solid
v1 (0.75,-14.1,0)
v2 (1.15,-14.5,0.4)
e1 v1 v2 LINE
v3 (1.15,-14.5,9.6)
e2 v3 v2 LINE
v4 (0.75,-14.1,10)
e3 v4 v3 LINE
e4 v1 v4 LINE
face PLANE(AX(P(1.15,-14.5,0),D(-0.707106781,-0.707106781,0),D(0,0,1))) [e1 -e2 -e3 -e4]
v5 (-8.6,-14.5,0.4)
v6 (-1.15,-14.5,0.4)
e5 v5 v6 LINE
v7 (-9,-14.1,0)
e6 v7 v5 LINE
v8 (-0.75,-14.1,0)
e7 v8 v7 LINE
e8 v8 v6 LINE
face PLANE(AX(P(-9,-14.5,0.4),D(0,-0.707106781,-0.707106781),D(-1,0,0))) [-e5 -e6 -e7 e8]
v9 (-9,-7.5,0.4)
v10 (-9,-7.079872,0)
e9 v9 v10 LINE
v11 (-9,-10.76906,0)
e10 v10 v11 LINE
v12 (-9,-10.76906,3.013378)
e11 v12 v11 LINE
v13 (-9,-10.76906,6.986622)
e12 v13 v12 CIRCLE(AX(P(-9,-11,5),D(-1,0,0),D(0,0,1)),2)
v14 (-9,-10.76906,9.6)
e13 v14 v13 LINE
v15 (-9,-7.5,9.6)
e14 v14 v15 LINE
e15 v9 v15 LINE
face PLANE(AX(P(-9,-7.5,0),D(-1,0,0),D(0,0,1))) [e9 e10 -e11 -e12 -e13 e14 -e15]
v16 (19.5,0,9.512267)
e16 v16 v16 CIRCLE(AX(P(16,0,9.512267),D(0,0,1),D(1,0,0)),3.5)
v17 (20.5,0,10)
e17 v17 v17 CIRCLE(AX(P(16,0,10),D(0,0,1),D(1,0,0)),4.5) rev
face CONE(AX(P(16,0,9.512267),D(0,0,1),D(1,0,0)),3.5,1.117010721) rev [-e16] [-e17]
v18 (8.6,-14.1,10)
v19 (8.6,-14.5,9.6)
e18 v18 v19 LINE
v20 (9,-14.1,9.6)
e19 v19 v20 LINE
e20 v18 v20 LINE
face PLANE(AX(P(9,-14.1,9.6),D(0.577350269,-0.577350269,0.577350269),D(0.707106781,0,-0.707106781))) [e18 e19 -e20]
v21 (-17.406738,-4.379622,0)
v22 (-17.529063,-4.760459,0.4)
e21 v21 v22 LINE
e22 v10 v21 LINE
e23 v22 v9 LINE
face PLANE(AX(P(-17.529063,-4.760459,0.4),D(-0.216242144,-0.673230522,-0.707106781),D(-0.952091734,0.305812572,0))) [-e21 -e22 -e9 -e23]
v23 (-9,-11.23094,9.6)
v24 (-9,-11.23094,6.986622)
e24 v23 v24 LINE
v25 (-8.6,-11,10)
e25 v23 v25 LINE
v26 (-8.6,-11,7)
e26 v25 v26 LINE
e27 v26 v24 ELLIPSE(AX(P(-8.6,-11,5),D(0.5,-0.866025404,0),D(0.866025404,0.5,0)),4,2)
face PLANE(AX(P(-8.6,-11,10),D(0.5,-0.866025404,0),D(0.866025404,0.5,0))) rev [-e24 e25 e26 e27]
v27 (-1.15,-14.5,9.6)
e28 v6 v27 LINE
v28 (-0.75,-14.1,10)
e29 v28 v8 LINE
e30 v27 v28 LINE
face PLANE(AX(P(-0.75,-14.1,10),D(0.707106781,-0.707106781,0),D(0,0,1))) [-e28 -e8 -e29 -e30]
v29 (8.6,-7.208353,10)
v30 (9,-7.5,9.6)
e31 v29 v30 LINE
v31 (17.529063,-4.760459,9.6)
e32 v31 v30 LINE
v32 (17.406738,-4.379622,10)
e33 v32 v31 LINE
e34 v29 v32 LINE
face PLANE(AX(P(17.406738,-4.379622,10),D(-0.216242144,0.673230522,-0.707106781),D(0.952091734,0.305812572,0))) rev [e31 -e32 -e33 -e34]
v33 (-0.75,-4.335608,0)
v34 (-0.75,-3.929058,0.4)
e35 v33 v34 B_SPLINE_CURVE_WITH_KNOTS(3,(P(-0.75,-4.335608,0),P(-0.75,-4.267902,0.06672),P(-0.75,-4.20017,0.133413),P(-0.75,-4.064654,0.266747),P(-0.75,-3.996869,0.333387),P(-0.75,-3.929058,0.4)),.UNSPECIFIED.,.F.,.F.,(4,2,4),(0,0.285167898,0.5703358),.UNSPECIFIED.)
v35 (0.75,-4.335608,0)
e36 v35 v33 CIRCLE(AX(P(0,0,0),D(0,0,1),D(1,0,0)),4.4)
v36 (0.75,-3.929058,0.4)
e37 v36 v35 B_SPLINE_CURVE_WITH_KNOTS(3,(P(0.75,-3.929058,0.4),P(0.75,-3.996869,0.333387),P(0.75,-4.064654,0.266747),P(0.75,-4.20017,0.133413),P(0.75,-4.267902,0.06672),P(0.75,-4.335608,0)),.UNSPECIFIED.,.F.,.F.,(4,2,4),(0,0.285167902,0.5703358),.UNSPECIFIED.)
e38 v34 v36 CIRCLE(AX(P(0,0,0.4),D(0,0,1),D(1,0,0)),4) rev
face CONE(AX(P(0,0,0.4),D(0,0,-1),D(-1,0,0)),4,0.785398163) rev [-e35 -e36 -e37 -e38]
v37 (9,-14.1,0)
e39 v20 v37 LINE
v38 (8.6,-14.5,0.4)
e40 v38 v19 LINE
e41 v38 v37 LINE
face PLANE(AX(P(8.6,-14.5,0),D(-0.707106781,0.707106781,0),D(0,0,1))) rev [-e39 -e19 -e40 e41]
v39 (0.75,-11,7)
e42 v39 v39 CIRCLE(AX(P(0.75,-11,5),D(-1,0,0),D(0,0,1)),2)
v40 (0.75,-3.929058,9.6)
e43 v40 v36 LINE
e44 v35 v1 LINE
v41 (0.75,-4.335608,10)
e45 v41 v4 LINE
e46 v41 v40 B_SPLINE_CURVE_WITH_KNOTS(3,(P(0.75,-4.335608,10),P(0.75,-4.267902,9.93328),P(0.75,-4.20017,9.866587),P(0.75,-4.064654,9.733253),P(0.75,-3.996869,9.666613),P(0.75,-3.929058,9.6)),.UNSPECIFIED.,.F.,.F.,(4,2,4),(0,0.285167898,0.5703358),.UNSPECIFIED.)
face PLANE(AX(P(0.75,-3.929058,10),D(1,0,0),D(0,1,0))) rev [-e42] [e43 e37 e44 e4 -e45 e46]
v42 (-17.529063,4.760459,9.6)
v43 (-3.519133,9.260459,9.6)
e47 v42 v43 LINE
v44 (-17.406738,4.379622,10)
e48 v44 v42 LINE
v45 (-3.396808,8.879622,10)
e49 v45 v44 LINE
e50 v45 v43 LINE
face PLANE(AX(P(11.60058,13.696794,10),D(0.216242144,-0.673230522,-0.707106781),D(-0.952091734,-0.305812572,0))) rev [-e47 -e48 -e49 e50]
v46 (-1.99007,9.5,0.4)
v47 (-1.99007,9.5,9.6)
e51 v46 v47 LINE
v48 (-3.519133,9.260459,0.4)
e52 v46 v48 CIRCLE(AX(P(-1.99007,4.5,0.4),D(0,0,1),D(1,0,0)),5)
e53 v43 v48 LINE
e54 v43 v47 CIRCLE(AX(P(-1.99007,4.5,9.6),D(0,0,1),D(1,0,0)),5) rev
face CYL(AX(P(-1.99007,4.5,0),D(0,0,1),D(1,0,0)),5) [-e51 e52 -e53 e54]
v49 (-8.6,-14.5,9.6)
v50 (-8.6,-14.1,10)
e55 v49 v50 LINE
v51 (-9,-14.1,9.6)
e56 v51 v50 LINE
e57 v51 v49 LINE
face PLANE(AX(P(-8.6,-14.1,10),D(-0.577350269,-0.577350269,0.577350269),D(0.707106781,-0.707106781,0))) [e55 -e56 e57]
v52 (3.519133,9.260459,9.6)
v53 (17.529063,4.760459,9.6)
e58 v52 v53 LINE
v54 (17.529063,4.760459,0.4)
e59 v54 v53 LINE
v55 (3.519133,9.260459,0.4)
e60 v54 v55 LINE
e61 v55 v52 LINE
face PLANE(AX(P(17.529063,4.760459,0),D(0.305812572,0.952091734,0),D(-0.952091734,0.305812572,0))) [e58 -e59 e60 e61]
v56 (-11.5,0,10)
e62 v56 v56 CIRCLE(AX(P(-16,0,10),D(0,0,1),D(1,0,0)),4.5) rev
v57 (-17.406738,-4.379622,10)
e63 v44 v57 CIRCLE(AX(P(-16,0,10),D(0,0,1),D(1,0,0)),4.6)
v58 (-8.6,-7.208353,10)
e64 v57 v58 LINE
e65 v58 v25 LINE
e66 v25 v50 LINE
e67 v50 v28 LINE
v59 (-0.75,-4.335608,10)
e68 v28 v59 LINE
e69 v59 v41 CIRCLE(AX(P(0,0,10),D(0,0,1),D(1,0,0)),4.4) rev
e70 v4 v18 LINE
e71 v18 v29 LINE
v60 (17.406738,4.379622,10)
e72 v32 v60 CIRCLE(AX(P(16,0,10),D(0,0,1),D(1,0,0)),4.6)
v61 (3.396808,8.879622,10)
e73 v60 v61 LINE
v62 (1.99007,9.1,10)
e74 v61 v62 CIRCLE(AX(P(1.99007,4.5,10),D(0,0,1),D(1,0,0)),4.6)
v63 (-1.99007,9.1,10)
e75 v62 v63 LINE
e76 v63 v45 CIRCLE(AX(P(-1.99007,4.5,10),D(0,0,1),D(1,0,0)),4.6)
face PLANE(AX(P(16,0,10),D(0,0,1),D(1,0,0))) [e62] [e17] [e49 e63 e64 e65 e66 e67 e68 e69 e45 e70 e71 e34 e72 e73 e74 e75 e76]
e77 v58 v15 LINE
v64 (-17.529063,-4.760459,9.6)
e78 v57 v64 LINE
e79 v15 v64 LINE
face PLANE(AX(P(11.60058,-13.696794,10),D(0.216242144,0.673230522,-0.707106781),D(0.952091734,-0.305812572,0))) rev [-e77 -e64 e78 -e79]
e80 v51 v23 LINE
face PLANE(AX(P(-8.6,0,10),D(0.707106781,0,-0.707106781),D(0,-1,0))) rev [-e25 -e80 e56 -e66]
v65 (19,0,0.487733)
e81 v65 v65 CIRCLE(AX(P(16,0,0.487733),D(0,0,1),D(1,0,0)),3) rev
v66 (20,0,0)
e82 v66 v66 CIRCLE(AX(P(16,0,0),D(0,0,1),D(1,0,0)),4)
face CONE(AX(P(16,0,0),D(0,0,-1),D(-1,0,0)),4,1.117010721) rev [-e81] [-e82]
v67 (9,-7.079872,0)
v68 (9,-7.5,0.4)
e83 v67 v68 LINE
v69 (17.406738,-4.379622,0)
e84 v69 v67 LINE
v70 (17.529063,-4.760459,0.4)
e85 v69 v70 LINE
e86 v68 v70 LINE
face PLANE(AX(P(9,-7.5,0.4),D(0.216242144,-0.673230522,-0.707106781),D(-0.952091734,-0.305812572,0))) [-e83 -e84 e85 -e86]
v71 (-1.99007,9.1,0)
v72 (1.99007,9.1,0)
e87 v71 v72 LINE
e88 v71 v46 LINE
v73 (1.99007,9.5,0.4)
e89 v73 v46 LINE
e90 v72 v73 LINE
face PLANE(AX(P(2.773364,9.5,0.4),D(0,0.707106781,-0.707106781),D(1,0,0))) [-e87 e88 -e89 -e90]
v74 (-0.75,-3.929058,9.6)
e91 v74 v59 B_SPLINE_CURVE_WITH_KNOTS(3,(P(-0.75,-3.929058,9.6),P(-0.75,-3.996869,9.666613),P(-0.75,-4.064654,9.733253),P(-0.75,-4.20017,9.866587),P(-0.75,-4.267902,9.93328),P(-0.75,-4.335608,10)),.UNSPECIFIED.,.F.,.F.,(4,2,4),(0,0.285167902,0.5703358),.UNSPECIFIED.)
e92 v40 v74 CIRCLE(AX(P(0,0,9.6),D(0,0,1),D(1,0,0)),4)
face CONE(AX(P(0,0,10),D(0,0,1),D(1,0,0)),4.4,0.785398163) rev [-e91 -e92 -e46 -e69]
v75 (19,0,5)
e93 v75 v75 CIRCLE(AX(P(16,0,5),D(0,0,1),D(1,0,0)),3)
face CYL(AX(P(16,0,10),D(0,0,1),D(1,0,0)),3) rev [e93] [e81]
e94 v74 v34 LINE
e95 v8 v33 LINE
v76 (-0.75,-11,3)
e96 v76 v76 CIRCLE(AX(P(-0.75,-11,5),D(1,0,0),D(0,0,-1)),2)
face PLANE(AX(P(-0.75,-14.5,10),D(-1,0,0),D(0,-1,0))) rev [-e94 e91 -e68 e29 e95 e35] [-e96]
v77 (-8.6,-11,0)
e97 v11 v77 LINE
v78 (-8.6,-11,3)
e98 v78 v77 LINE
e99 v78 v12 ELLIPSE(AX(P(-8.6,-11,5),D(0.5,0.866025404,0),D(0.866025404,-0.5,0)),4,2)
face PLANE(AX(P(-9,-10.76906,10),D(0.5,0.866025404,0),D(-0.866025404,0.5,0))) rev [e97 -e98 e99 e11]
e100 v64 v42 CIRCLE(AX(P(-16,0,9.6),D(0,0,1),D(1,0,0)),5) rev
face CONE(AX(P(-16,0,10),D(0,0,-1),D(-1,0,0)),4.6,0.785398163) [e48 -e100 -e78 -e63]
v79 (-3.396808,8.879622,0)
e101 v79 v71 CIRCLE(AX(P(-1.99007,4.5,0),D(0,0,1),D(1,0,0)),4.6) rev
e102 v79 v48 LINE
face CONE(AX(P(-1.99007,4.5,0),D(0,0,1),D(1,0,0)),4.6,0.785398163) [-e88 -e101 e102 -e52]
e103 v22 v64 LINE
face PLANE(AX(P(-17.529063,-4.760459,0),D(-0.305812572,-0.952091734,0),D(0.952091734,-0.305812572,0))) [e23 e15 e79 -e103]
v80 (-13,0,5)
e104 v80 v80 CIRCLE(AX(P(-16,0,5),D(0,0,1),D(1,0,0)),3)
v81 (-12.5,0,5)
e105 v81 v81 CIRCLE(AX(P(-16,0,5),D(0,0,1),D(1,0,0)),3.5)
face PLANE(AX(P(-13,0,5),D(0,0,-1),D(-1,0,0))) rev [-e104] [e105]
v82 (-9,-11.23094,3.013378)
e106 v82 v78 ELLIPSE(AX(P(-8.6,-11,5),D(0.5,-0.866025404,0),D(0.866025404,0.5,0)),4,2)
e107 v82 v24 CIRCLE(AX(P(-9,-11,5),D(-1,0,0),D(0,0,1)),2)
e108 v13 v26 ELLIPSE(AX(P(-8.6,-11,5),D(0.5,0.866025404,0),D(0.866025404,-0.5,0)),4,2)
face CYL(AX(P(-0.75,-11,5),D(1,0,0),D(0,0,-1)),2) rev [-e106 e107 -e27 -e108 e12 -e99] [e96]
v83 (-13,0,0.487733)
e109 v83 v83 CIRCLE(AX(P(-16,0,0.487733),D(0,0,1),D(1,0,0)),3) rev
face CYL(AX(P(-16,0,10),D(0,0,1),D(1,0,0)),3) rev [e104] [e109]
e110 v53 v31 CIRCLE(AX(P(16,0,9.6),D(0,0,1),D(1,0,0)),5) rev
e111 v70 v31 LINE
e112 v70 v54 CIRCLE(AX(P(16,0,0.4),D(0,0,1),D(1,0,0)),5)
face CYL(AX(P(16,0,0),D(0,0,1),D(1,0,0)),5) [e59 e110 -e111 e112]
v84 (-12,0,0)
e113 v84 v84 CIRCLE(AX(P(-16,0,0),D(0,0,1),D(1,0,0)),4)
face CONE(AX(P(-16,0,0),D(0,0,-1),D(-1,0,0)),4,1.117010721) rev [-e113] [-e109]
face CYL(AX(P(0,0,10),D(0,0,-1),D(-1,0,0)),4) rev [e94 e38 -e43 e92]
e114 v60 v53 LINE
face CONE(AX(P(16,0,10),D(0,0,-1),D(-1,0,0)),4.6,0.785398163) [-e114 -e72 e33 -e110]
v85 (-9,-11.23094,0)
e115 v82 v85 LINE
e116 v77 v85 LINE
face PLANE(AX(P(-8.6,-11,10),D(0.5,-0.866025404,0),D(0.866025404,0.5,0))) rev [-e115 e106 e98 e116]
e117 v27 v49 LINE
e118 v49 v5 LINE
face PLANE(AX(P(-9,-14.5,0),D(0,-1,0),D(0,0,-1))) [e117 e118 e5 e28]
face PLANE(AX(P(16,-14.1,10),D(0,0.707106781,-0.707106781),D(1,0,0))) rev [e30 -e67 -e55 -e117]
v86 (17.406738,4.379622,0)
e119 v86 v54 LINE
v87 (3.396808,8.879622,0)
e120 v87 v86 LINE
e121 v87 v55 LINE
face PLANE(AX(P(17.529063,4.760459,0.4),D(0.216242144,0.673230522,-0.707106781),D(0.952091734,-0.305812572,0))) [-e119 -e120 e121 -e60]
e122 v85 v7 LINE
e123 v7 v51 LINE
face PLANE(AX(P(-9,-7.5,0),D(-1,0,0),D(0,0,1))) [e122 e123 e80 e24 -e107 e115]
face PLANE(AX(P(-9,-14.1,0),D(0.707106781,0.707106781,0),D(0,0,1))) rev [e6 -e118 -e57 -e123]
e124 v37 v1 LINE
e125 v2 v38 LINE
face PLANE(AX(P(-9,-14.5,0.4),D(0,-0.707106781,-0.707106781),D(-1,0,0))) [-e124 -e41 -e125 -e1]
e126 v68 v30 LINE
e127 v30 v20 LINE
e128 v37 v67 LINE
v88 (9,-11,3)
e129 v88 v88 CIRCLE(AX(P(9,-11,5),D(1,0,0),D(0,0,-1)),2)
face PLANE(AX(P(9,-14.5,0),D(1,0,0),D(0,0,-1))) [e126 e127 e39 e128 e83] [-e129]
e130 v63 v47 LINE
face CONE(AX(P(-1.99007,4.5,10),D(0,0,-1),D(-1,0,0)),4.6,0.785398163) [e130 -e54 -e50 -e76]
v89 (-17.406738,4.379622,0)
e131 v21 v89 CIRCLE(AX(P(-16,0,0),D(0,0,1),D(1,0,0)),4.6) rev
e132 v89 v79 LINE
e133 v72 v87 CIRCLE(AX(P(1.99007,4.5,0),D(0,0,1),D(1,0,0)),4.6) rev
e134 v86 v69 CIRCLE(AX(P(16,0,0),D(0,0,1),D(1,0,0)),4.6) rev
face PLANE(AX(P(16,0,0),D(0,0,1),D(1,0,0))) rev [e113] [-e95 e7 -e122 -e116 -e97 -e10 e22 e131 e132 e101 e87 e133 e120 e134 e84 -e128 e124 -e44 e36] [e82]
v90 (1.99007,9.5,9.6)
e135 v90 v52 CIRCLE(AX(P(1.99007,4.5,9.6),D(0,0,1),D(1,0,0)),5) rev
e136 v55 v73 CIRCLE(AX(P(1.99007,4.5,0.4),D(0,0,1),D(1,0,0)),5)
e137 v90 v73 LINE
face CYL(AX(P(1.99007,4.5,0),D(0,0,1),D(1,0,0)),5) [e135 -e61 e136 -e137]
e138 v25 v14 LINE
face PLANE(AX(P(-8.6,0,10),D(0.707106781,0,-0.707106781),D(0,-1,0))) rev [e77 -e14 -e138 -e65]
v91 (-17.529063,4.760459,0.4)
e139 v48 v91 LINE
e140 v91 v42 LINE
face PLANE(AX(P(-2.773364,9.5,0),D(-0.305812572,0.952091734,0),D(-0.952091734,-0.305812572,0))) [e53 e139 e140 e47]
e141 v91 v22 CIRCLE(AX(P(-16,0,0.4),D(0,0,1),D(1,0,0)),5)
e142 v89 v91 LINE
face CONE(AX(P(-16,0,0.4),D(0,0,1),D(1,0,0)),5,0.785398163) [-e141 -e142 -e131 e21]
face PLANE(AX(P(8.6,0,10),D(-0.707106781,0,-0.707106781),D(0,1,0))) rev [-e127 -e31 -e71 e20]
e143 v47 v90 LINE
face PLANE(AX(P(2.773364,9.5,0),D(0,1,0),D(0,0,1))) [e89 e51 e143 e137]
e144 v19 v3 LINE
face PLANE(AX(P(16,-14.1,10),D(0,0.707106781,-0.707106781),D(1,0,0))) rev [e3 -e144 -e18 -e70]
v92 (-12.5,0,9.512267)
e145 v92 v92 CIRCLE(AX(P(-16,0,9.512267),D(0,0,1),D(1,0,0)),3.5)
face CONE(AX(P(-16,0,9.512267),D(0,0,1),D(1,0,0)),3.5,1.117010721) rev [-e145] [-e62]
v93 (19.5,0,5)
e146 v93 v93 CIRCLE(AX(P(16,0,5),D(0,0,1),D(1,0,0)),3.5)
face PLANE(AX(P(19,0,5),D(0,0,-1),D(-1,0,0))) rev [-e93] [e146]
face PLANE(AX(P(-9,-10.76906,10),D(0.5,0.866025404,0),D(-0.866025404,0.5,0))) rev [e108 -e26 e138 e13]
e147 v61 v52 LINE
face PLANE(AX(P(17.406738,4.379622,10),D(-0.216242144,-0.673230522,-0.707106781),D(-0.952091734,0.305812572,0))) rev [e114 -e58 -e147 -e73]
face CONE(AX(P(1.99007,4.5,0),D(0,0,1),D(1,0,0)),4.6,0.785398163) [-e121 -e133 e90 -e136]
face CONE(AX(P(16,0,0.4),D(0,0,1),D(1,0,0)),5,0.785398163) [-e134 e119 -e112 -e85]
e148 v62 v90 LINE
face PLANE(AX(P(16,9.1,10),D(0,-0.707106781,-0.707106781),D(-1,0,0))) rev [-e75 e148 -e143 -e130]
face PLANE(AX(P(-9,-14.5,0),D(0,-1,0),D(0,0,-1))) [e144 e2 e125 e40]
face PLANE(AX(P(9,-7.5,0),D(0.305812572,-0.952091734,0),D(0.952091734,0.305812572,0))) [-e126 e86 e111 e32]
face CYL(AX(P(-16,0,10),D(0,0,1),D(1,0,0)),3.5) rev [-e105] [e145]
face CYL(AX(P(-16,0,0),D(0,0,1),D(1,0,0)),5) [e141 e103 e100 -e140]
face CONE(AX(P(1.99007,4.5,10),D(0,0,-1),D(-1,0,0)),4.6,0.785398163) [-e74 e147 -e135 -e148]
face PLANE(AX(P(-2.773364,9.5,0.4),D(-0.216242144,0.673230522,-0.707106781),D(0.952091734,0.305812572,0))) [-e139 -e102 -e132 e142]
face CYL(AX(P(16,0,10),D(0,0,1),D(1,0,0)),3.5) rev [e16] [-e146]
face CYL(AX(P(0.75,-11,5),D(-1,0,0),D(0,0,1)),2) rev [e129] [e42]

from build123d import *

# Parameters (mm, degrees)
BOSS_EXTRUDE1_DEPTH             = 10
CUT_EXTRUDE1_DEPTH              = 28.408940147
CUT_EXTRUDE2_DEPTH              = 28.408940147
SKETCH4_W                       = 4
SKETCH4_H                       = 10
SKETCH5_W                       = 2
SKETCH5_H                       = 20.25
F_4_0_4_DIAMETER_HOLE2_D        = 4
F_4_0_4_DIAMETER_HOLE2_DEPTH    = 20.25
M7X1_0_TAPPED_HOLE1_D           = 6
M7X1_0_TAPPED_HOLE1_CBORE_D     = 7
M7X1_0_TAPPED_HOLE1_CBORE_DEPTH = 5
FILLET1_R                       = 5
CHAMFER1_SIZE                   = 1
CHAMFER1_SIZE2                  = 0.487732589
CHAMFER2_SIZE                   = 0.4
CHAMFER3_SIZE                   = 1
CHAMFER3_SIZE2                  = 0.487732589


with BuildPart() as part:
    # Sketch1 → Boss-Extrude1 (new body)
    with BuildSketch(Plane.XY.offset(10)):
        with BuildLine():
            Line((-9, -7.5), (-9, -14.5))
            Line((-9, -14.5), (9, -14.5))
            Line((9, -14.5), (9, -7.5))
            Line((9, -7.5), (17.529062862, -4.760458672))
            ThreePointArc((17.529062862, -4.760458672), (21, 0), (17.529062862, 4.760458672))
            Line((17.529062862, 4.760458672), (2.773364341, 9.5))
            Line((2.773364341, 9.5), (-2.773364341, 9.5))
            Line((-2.773364341, 9.5), (-17.529062862, 4.760458672))
            ThreePointArc((-17.529062862, 4.760458672), (-21, 0), (-17.529062862, -4.760458672))
            Line((-17.529062862, -4.760458672), (-9, -7.5))
        make_face()
    extrude(amount=-BOSS_EXTRUDE1_DEPTH)

    # Sketch2 → Cut-Extrude1 (cut, through all)
    with BuildSketch(Plane(origin=(0, 0, 0), x_dir=(-1, 0, 0), z_dir=(0, 0, -1))):
        Polygon((9, -11.230940108), (9, -10.769059892), (8.6, -11), align=None)
    extrude(amount=-CUT_EXTRUDE1_DEPTH, mode=Mode.SUBTRACT)

    # Sketch3 → Cut-Extrude2 (cut, through all)
    with BuildSketch(Plane(origin=(0, 0, 0), x_dir=(-1, 0, 0), z_dir=(0, 0, -1))):
        with BuildLine():
            Line((0.75, -14.5), (0.75, -3.929058411))
            ThreePointArc((0.75, -3.929058411), (0, -4), (-0.75, -3.929058411))
            Line((-0.75, -3.929058411), (-0.75, -14.5))
            Line((-0.75, -14.5), (0.75, -14.5))
        make_face()
    extrude(amount=-CUT_EXTRUDE2_DEPTH, mode=Mode.SUBTRACT)

    # Sketch4 → Cut-Revolve1 (revolve, cut)
    with BuildSketch(Plane.XZ):
        with Locations((2, 5)):
            Rectangle(SKETCH4_W, SKETCH4_H)
    revolve(axis=Axis((0, 0, 10), (0, 0, -1)), mode=Mode.SUBTRACT)

    # Sketch5 → Ø4.0 (4) Diameter Hole1 (revolve, cut)
    with BuildSketch(Plane(origin=(-0.75, -11, 5), x_dir=(0, 0, -1), z_dir=(0, 1, 0))):
        with Locations((1, 10.125)):
            Rectangle(SKETCH5_W, SKETCH5_H)
    revolve(axis=Axis((5.6, -11, 5), (-1, 0, 0)), mode=Mode.SUBTRACT)

    # Ø4.0 (4) Diameter Hole2
    with Locations(Plane.ZY.offset(-0.75)):
        with Locations((5, -11)):
            Hole(F_4_0_4_DIAMETER_HOLE2_D / 2, depth=F_4_0_4_DIAMETER_HOLE2_DEPTH)

    # M7x1.0 Tapped Hole1 (through all)
    with Locations(Plane.XY.offset(10)):
        with Locations((-16, 0), (16, 0)):
            CounterBoreHole(M7X1_0_TAPPED_HOLE1_D / 2, M7X1_0_TAPPED_HOLE1_CBORE_D / 2, M7X1_0_TAPPED_HOLE1_CBORE_DEPTH)

    # Fillet1
    fillet1_edges = [part.edges().sort_by_distance(p)[0] for p in [
        (-2.773364341, 9.5, 5),
        (2.773364341, 9.5, 5),
    ]]
    fillet(fillet1_edges, radius=FILLET1_R)

    # Chamfer1
    chamfer1_edges = [part.edges().sort_by_distance(p)[0] for p in [
        (12.5, 0, 10),
        (-19.5, 0, 10),
    ]]
    chamfer1_side = [part.faces().sort_by_distance(p)[0] for p in [
        (0, 9.016264535, 10),
    ]]
    chamfer(chamfer1_edges, length=CHAMFER1_SIZE, length2=CHAMFER1_SIZE2, reference=chamfer1_side[0])

    # Chamfer2
    chamfer2_edges = [part.edges().sort_by_distance(p)[0] for p in [
        (13.264531431, -6.130229336, 0),
        (21, 0, 0),
        (10.524097746, 7.010458672, 0),
        (2.763925905, 9.439751682, 0),
        (0, 9.5, 0),
        (-2.763925905, 9.439751682, 0),
        (-10.524097746, 7.010458672, 0),
        (-13.264531431, -6.130229336, 0),
        (-21, 0, 0),
        (-9, -9.134529946, 10),
        (-13.264531431, -6.130229336, 10),
        (-21, 0, 10),
        (-10.524097746, 7.010458672, 10),
        (-2.763925905, 9.439751682, 10),
        (0, 9.5, 10),
        (2.763925905, 9.439751682, 10),
        (10.524097746, 7.010458672, 10),
        (21, 0, 10),
        (13.264531431, -6.130229336, 10),
        (9, -11, 10),
        (4.875, -14.5, 10),
        (9, -14.5, 5),
        (0.75, -14.5, 5),
        (4.875, -14.5, 0),
        (0, 4, 10),
        (-9, -12.865470054, 10),
        (-9, -14.5, 5),
        (-4.875, -14.5, 0),
        (-0.75, -14.5, 5),
        (-4.875, -14.5, 10),
        (0, 4, 0),
    ]]
    chamfer(chamfer2_edges, length=CHAMFER2_SIZE - 0.0001)  # a hair under: the kernel refuses the full size

    # Chamfer3
    chamfer3_edges = [part.edges().sort_by_distance(p)[0] for p in [
        (19, 0, 0),
        (-13, 0, 0),
    ]]
    chamfer3_side = [part.faces().sort_by_distance(p)[0] for p in [
        (4.875, -13.627267497, 0),
    ]]
    chamfer(chamfer3_edges, length=CHAMFER3_SIZE, length2=CHAMFER3_SIZE2, reference=chamfer3_side[0])


solid = part.part
